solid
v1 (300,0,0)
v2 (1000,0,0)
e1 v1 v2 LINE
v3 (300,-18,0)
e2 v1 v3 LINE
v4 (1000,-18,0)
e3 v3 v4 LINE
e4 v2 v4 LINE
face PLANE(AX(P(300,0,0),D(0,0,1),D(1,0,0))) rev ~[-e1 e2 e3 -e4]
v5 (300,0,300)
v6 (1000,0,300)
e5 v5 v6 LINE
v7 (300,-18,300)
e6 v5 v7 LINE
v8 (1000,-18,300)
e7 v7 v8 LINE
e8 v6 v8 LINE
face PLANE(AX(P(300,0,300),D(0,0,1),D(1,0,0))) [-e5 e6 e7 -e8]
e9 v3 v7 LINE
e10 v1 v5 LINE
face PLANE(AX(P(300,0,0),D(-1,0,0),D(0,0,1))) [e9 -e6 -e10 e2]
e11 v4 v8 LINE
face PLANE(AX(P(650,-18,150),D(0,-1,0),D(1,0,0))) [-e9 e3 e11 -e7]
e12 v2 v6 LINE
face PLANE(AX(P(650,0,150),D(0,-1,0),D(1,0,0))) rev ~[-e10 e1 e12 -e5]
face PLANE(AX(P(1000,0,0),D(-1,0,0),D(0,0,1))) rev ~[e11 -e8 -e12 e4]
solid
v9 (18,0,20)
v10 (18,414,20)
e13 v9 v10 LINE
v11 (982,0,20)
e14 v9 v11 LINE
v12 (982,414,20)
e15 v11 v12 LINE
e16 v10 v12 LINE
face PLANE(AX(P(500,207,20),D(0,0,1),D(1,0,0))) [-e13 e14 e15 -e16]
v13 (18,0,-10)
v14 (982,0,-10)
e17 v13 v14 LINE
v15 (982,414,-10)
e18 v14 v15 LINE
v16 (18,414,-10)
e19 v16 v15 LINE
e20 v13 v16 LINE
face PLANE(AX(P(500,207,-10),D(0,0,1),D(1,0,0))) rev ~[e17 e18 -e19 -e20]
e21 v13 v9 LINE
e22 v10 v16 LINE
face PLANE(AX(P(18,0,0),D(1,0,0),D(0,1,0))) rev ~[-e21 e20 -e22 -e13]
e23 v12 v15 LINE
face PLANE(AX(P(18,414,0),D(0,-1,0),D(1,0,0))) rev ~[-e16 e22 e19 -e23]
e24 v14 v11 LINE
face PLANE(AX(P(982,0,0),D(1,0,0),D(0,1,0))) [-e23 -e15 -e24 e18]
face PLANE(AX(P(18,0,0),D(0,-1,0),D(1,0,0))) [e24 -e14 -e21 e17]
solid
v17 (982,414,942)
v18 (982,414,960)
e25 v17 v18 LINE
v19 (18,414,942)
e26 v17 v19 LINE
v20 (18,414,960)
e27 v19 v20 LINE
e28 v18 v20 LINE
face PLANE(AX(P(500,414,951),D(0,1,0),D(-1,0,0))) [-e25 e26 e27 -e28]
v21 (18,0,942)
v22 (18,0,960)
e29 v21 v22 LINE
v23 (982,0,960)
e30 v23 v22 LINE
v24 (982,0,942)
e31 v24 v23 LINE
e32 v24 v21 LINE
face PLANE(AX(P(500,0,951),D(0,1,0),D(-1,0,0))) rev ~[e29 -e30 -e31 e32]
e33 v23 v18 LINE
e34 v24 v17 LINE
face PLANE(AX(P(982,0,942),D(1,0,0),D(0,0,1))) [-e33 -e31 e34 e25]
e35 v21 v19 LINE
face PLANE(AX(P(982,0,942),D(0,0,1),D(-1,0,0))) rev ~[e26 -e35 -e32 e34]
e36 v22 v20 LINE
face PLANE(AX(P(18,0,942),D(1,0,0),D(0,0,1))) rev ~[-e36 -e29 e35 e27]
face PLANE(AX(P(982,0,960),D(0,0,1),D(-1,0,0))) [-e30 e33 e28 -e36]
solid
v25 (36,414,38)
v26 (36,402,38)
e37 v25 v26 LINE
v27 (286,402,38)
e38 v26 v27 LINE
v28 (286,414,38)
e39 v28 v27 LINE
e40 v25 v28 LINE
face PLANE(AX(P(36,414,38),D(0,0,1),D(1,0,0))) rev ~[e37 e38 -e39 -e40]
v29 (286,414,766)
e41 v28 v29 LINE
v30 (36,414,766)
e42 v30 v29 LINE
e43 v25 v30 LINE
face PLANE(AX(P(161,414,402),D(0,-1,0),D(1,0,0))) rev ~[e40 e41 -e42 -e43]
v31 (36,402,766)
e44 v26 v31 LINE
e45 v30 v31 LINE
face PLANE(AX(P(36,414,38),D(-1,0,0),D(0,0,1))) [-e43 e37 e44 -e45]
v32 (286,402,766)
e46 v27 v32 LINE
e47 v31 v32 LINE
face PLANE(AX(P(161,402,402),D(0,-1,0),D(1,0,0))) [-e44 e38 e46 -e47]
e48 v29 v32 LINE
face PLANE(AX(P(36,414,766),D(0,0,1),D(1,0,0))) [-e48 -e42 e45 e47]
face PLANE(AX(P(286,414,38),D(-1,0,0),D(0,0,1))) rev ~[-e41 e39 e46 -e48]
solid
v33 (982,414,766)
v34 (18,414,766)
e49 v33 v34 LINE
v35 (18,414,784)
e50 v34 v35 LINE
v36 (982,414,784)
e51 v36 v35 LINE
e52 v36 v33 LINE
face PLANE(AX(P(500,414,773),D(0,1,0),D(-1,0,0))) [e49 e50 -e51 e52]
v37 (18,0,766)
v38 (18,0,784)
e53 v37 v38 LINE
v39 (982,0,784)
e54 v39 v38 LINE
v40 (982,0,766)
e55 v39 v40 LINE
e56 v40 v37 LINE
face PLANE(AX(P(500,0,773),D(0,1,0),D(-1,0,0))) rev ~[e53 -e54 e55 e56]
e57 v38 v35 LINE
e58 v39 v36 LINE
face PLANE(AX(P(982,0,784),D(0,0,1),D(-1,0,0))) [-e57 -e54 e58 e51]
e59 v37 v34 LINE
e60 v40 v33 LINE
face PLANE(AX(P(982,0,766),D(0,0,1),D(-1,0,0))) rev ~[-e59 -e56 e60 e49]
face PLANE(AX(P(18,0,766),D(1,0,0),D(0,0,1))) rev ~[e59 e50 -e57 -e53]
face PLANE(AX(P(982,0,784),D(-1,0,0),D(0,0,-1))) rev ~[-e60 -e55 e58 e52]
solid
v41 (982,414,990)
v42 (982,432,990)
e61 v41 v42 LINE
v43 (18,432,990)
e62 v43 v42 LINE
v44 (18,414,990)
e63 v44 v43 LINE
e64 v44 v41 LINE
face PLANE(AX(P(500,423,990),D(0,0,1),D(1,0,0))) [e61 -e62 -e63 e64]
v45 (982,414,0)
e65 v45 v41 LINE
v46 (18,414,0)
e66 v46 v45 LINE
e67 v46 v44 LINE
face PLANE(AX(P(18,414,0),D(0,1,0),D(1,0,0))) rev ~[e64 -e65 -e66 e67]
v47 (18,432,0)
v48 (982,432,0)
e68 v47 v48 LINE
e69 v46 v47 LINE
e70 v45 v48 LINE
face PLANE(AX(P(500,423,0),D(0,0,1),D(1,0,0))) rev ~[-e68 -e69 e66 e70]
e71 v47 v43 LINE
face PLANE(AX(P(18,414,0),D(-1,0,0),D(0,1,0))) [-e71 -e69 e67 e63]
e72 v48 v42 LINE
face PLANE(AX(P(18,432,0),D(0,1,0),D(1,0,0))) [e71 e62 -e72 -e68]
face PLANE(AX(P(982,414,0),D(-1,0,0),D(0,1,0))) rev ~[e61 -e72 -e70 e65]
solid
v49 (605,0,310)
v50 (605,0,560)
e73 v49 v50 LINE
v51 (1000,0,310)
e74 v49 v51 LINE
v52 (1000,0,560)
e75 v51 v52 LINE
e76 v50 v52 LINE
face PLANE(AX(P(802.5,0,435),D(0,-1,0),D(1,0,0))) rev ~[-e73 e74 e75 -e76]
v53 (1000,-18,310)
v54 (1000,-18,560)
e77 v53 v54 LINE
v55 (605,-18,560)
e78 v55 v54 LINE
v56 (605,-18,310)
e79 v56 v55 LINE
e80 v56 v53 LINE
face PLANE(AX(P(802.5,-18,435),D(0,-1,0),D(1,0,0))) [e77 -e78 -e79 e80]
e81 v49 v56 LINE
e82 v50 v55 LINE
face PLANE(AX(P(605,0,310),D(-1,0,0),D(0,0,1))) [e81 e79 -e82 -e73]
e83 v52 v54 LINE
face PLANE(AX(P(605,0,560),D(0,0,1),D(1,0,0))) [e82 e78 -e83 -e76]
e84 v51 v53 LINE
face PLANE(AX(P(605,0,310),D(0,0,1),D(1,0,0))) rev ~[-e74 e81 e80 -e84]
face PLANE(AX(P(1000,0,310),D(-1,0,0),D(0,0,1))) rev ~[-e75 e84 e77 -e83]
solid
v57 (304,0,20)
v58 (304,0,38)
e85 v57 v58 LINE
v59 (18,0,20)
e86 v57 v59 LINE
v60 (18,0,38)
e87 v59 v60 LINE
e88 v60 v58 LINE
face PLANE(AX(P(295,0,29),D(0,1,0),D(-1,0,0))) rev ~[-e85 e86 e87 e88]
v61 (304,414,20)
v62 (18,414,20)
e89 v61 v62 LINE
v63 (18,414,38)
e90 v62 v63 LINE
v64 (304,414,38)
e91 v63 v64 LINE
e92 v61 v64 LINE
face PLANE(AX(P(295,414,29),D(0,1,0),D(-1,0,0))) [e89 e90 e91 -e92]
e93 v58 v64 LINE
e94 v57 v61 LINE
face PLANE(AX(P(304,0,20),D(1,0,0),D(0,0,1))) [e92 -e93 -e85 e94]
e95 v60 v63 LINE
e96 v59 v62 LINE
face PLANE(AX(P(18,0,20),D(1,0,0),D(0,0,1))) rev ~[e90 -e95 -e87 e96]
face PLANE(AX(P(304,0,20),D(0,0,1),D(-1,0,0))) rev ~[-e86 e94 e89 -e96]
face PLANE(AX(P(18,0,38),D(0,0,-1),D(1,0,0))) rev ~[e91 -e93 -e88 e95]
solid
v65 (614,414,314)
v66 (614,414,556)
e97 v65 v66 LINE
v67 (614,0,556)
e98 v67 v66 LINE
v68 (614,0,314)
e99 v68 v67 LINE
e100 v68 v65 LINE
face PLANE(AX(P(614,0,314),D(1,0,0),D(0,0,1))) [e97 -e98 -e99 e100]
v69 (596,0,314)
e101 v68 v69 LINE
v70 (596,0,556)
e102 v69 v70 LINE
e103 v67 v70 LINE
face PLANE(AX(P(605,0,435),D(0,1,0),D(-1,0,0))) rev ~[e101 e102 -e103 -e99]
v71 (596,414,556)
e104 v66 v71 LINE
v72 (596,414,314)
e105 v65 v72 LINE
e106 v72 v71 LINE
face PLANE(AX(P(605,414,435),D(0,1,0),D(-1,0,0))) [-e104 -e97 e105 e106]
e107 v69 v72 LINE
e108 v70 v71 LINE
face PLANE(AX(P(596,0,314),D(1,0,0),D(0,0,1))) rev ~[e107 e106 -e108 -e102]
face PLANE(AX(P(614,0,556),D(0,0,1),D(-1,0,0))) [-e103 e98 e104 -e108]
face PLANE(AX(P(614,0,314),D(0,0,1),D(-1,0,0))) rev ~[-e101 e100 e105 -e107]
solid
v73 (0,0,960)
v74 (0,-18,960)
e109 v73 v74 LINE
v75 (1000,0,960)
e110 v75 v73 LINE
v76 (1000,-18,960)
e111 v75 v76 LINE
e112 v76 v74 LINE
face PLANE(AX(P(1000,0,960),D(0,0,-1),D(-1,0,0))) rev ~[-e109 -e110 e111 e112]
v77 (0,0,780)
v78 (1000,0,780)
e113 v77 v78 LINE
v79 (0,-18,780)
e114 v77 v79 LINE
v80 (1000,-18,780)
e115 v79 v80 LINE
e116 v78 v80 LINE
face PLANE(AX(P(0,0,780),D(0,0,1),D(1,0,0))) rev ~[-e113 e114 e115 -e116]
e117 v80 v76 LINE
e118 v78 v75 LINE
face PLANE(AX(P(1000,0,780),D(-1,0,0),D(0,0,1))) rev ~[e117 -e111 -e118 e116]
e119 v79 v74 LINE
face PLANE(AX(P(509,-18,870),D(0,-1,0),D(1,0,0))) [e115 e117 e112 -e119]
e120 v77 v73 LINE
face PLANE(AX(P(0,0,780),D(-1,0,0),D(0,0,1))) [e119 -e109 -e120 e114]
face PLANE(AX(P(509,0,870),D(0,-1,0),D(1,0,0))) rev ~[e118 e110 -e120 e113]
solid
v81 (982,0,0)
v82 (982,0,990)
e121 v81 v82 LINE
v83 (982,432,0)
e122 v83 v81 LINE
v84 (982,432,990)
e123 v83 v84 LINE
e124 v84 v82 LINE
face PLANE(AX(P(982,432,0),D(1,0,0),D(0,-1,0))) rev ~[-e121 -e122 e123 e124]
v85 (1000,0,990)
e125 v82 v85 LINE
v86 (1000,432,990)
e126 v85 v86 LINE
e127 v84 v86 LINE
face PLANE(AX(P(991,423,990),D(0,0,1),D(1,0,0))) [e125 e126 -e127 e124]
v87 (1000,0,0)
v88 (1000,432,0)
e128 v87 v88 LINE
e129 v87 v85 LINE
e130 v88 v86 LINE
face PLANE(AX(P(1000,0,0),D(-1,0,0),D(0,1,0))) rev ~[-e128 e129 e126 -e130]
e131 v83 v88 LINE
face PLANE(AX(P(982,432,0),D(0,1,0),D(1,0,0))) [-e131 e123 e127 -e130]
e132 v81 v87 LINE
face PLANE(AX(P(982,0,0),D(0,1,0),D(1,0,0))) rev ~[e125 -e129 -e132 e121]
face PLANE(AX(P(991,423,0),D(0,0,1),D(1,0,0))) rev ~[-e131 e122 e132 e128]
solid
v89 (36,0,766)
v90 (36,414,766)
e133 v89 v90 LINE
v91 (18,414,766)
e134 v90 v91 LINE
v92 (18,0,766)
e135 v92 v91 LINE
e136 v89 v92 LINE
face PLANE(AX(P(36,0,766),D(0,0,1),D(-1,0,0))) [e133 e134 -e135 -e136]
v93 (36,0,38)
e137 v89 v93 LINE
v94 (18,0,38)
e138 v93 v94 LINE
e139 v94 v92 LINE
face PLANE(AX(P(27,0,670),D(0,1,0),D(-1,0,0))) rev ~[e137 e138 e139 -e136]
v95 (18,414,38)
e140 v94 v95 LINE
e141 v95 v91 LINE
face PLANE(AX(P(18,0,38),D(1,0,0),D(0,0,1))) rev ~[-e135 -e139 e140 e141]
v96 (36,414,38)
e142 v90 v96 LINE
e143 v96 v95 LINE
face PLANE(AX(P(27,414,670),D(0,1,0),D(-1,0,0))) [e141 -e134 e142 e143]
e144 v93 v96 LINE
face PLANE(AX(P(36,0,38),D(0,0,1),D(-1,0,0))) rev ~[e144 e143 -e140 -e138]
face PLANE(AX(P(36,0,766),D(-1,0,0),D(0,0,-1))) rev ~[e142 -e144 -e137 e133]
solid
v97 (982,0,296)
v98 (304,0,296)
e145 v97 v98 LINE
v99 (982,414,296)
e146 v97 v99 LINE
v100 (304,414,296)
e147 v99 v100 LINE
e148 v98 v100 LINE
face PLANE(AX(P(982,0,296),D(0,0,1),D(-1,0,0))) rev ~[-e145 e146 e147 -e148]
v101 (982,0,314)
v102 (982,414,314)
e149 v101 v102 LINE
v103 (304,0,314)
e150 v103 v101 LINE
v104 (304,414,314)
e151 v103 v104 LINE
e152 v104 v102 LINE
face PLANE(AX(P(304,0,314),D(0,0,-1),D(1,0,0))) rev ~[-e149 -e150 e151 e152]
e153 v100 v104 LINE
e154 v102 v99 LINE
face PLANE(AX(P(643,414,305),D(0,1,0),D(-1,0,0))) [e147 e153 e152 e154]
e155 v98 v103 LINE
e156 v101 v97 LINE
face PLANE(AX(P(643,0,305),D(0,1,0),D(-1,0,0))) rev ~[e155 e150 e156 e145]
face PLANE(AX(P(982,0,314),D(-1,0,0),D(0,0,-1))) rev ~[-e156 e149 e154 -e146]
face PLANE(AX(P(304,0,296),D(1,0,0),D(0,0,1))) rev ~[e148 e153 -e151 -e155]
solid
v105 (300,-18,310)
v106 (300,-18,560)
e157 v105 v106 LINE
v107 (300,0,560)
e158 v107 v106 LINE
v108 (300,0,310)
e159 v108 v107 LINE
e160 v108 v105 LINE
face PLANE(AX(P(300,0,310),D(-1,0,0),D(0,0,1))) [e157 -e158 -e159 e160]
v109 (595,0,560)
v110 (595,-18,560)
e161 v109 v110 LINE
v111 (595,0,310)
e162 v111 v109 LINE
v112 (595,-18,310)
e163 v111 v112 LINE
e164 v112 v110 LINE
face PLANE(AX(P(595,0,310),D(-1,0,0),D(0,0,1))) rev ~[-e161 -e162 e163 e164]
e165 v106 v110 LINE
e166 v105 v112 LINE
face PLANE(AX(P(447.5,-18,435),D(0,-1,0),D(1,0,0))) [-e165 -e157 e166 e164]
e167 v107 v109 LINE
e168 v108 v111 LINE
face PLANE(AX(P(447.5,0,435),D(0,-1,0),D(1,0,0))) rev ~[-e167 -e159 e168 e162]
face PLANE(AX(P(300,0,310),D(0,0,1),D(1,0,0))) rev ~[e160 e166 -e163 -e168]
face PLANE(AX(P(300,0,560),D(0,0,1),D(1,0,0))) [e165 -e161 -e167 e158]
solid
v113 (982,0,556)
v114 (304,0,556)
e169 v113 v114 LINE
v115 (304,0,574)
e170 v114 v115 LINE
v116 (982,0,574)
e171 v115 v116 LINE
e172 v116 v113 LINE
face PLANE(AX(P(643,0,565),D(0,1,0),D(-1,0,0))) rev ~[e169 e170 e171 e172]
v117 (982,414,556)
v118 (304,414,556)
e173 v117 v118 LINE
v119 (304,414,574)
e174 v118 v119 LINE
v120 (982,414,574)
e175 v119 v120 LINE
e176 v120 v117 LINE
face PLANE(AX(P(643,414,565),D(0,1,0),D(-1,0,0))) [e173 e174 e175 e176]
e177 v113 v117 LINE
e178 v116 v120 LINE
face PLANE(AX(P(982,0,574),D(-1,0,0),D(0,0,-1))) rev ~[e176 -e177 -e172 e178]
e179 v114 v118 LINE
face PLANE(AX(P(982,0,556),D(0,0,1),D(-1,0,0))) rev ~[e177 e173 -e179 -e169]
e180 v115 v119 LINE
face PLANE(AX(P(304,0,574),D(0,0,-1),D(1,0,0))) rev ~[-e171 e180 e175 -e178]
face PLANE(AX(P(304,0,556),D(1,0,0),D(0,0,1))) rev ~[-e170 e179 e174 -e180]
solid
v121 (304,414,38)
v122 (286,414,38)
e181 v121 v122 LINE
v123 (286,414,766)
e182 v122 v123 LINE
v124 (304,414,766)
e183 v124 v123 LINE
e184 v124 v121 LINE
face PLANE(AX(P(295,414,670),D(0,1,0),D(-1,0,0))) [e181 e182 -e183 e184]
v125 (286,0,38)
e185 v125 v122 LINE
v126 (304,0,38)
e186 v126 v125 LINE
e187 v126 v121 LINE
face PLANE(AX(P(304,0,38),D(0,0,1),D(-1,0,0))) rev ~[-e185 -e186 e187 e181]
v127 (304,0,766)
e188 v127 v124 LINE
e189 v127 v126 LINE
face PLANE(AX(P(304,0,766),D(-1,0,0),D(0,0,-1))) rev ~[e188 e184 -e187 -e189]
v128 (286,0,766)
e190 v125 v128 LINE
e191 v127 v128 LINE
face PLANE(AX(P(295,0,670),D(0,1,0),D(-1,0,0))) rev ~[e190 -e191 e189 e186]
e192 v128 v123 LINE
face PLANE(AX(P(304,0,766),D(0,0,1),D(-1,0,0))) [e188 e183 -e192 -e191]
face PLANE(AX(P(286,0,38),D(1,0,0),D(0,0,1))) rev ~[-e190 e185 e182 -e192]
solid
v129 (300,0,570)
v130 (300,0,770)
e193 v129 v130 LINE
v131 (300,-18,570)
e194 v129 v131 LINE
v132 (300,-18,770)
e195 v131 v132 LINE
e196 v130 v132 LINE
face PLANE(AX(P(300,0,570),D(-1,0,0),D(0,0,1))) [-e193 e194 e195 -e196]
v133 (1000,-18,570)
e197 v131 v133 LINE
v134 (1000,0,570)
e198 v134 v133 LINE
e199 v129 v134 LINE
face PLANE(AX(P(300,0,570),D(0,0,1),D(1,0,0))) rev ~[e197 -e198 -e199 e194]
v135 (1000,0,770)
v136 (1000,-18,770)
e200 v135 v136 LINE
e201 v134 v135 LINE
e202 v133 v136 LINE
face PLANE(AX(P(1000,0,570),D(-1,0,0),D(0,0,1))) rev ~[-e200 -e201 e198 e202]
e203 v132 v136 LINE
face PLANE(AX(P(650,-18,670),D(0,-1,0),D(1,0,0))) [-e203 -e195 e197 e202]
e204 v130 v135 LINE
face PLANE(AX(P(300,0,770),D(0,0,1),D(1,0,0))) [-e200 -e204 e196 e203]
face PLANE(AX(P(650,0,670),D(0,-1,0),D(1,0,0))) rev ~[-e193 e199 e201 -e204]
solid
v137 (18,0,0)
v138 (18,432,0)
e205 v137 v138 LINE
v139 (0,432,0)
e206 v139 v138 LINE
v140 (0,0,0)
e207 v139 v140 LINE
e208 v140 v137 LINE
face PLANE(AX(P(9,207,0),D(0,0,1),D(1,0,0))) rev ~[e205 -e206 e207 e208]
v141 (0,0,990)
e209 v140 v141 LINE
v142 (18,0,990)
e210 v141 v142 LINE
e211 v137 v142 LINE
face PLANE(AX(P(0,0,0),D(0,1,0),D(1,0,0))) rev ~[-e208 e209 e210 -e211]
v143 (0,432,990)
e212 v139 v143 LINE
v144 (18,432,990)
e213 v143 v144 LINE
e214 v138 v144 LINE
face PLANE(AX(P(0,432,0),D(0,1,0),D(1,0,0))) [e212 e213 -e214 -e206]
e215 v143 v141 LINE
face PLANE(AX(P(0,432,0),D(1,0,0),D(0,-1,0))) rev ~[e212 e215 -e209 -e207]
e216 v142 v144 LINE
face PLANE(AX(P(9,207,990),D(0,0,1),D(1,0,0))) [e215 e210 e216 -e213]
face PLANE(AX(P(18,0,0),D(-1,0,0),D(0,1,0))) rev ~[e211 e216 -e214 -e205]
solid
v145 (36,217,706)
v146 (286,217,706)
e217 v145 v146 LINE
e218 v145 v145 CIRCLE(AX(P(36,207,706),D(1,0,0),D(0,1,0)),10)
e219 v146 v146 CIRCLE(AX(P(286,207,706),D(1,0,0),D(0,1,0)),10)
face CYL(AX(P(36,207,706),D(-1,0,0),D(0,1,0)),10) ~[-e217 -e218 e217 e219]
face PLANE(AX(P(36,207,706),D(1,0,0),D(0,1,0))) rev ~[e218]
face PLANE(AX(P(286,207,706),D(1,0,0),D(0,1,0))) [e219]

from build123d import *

# Parameters (mm, degrees)
F0_W          = 18
F0_H          = 414
F0_H_2        = 18
F1_DEPTH      = 990
F0_W_2        = 964
F2_DEPTH      = 990
F3_DEPTH      = 20
F3_DEPTH_BACK = 10
F4_W          = 982
F4_H          = 180
F4_W_2        = 18
F5_DEPTH      = 18
F4_W_3        = 700
F4_H_2        = 200
F4_W_4        = 395
F4_H_3        = 250
F4_H_4        = 300
F4_W_5        = 295
F6_W          = 964
F6_H          = 18
F7_DEPTH      = 414
F6_H_2        = 4
F6_W_2        = 18
F6_W_3        = 250
F6_H_3        = 192
F6_H_4        = 258
F6_H_5        = 242
F8_DEPTH      = 414
F9_R          = 10
F10_DEPTH     = 250
F11_W         = 250
F11_H         = 728
F12_DEPTH     = 12


# Not quite as in the source:
# - a feature names something its author has since deleted; it is built from what else it names


with BuildPart() as f1:
    # F0 (on Top) → F1 (new body)
    with BuildSketch(Plane.XY):
        with Locations((9, 207)):
            Rectangle(F0_W, F0_H)
        with Locations((9, 423)):
            Rectangle(F0_W, F0_H_2)
    extrude(amount=F1_DEPTH)


with BuildPart() as f1b:
    # F0 (on Top) → F1, piece 2 (new body)
    with BuildSketch(Plane.XY):
        with Locations((991, 423)):
            Rectangle(F0_W, F0_H_2)
        with Locations((991, 207)):
            Rectangle(F0_W, F0_H)
    extrude(amount=F1_DEPTH)


with BuildPart() as f2:
    # F0 (on Top) → F2 (new body, through all)
    with BuildSketch(Plane.XY):
        with Locations((500, 423)):
            Rectangle(F0_W_2, F0_H_2)
    extrude(amount=F2_DEPTH)


with BuildPart() as f3:
    # F0 (on Top) → F3 (new body, two sides)
    with BuildSketch(Plane.XY) as f3_sk:
        with Locations((500, 207)):
            Rectangle(F0_W_2, F0_H)
    extrude(amount=F3_DEPTH)
    extrude(f3_sk.sketch, amount=-F3_DEPTH_BACK)


with BuildPart() as f5:
    # F4 (on face) → F5 (new body)
    with BuildSketch(Plane.XZ):
        with Locations((509, 870)):
            Rectangle(F4_W, F4_H)
        with Locations((9, 870)):
            Rectangle(F4_W_2, F4_H)
    extrude(amount=F5_DEPTH)


with BuildPart() as f5b:
    # F4 (on face) → F5, piece 2 (new body)
    with BuildSketch(Plane.XZ):
        with Locations((650, 670)):
            Rectangle(F4_W_3, F4_H_2)
    extrude(amount=F5_DEPTH)


with BuildPart() as f5c:
    # F4 (on face) → F5, piece 3 (new body)
    with BuildSketch(Plane.XZ):
        with Locations((802.5, 435)):
            Rectangle(F4_W_4, F4_H_3)
    extrude(amount=F5_DEPTH)


with BuildPart() as f5d:
    # F4 (on face) → F5, piece 4 (new body)
    with BuildSketch(Plane.XZ):
        with Locations((650, 150)):
            Rectangle(F4_W_3, F4_H_4)
    extrude(amount=F5_DEPTH)


with BuildPart() as f5e:
    # F4 (on face) → F5, piece 5 (new body)
    with BuildSketch(Plane.XZ):
        with Locations((447.5, 435)):
            Rectangle(F4_W_5, F4_H_3)
    extrude(amount=F5_DEPTH)


with BuildPart() as f7:
    # F6 (on face) → F7 (new body, through all)
    with BuildSketch(Plane(origin=(0, 0, 0), x_dir=(-1, 0, 0), z_dir=(0, 1, 0))):
        with Locations((-500, 951)):
            Rectangle(F6_W, F6_H)
    extrude(amount=F7_DEPTH)


with BuildPart() as f7b:
    # F6 (on face) → F7, piece 2 (new body, through all)
    with BuildSketch(Plane(origin=(0, 0, 0), x_dir=(-1, 0, 0), z_dir=(0, 1, 0))):
        Polygon((-18, 780), (-982, 780), (-982, 766), (-304, 766), (-286, 766), (-36, 766), (-18, 766), align=None)
        with Locations((-500, 782)):
            Rectangle(F6_W, F6_H_2)
    extrude(amount=F7_DEPTH)


with BuildPart() as f7c:
    # F6 (on face) → F7, piece 3 (new body, through all)
    with BuildSketch(Plane(origin=(0, 0, 0), x_dir=(-1, 0, 0), z_dir=(0, 1, 0))):
        Polygon((-304, 556), (-304, 574), (-982, 574), (-982, 556), (-614, 556), (-596, 556), align=None)
    extrude(amount=F7_DEPTH)


with BuildPart() as f7d:
    # F6 (on face) → F7, piece 4 (new body, through all)
    with BuildSketch(Plane(origin=(0, 0, 0), x_dir=(-1, 0, 0), z_dir=(0, 1, 0))):
        Polygon((-304, 296), (-304, 314), (-596, 314), (-614, 314), (-982, 314), (-982, 296), align=None)
    extrude(amount=F7_DEPTH)


with BuildPart() as f7e:
    # F6 (on face) → F7, piece 5 (new body, through all)
    with BuildSketch(Plane(origin=(0, 0, 0), x_dir=(-1, 0, 0), z_dir=(0, 1, 0))):
        with Locations((-295, 29)):
            Rectangle(F6_W_2, F6_H)
        with Locations((-161, 29)):
            Rectangle(F6_W_3, F6_H)
        with Locations((-27, 29)):
            Rectangle(F6_W_2, F6_H)
    extrude(amount=F7_DEPTH)


with BuildPart() as f8:
    # F6 (on face) → F8 (new body, through all)
    with BuildSketch(Plane(origin=(0, 0, 0), x_dir=(-1, 0, 0), z_dir=(0, 1, 0))):
        with Locations((-295, 670)):
            Rectangle(F6_W_2, F6_H_3)
        with Locations((-295, 167)):
            Rectangle(F6_W_2, F6_H_4)
        with Locations((-295, 305)):
            Rectangle(F6_W_2, F6_H)
        with Locations((-295, 435)):
            Rectangle(F6_W_2, F6_H_5)
        with Locations((-295, 565)):
            Rectangle(F6_W_2, F6_H)
    extrude(amount=F8_DEPTH)


with BuildPart() as f8b:
    # F6 (on face) → F8, piece 2 (new body, through all)
    with BuildSketch(Plane(origin=(0, 0, 0), x_dir=(-1, 0, 0), z_dir=(0, 1, 0))):
        with Locations((-605, 435)):
            Rectangle(F6_W_2, F6_H_5)
    extrude(amount=F8_DEPTH)


with BuildPart() as f8c:
    # F6 (on face) → F8, piece 3 (new body, through all)
    with BuildSketch(Plane(origin=(0, 0, 0), x_dir=(-1, 0, 0), z_dir=(0, 1, 0))):
        with Locations((-27, 670)):
            Rectangle(F6_W_2, F6_H_3)
        with Locations((-27, 565)):
            Rectangle(F6_W_2, F6_H)
        with Locations((-27, 435)):
            Rectangle(F6_W_2, F6_H_5)
        with Locations((-27, 305)):
            Rectangle(F6_W_2, F6_H)
        with Locations((-27, 167)):
            Rectangle(F6_W_2, F6_H_4)
    extrude(amount=F8_DEPTH)


with BuildPart() as f10:
    # F9 (on face) → F10 (new body, through all)
    with BuildSketch(Plane.YZ.offset(36)):
        with Locations((207, 706)):
            Circle(F9_R)
    extrude(amount=F10_DEPTH)


with BuildPart() as f12:
    # F11 (on face) → F12 (new body)
    with BuildSketch(Plane.XZ.offset(-414)):
        with Locations((161, 402)):
            Rectangle(F11_W, F11_H)
    extrude(amount=F12_DEPTH)


solid = Compound([f1.part, f1b.part, f2.part, f3.part, f5.part, f5b.part, f5c.part, f5d.part, f5e.part, f7.part, f7b.part, f7c.part, f7d.part, f7e.part, f8.part, f8b.part, f8c.part, f10.part, f12.part])
